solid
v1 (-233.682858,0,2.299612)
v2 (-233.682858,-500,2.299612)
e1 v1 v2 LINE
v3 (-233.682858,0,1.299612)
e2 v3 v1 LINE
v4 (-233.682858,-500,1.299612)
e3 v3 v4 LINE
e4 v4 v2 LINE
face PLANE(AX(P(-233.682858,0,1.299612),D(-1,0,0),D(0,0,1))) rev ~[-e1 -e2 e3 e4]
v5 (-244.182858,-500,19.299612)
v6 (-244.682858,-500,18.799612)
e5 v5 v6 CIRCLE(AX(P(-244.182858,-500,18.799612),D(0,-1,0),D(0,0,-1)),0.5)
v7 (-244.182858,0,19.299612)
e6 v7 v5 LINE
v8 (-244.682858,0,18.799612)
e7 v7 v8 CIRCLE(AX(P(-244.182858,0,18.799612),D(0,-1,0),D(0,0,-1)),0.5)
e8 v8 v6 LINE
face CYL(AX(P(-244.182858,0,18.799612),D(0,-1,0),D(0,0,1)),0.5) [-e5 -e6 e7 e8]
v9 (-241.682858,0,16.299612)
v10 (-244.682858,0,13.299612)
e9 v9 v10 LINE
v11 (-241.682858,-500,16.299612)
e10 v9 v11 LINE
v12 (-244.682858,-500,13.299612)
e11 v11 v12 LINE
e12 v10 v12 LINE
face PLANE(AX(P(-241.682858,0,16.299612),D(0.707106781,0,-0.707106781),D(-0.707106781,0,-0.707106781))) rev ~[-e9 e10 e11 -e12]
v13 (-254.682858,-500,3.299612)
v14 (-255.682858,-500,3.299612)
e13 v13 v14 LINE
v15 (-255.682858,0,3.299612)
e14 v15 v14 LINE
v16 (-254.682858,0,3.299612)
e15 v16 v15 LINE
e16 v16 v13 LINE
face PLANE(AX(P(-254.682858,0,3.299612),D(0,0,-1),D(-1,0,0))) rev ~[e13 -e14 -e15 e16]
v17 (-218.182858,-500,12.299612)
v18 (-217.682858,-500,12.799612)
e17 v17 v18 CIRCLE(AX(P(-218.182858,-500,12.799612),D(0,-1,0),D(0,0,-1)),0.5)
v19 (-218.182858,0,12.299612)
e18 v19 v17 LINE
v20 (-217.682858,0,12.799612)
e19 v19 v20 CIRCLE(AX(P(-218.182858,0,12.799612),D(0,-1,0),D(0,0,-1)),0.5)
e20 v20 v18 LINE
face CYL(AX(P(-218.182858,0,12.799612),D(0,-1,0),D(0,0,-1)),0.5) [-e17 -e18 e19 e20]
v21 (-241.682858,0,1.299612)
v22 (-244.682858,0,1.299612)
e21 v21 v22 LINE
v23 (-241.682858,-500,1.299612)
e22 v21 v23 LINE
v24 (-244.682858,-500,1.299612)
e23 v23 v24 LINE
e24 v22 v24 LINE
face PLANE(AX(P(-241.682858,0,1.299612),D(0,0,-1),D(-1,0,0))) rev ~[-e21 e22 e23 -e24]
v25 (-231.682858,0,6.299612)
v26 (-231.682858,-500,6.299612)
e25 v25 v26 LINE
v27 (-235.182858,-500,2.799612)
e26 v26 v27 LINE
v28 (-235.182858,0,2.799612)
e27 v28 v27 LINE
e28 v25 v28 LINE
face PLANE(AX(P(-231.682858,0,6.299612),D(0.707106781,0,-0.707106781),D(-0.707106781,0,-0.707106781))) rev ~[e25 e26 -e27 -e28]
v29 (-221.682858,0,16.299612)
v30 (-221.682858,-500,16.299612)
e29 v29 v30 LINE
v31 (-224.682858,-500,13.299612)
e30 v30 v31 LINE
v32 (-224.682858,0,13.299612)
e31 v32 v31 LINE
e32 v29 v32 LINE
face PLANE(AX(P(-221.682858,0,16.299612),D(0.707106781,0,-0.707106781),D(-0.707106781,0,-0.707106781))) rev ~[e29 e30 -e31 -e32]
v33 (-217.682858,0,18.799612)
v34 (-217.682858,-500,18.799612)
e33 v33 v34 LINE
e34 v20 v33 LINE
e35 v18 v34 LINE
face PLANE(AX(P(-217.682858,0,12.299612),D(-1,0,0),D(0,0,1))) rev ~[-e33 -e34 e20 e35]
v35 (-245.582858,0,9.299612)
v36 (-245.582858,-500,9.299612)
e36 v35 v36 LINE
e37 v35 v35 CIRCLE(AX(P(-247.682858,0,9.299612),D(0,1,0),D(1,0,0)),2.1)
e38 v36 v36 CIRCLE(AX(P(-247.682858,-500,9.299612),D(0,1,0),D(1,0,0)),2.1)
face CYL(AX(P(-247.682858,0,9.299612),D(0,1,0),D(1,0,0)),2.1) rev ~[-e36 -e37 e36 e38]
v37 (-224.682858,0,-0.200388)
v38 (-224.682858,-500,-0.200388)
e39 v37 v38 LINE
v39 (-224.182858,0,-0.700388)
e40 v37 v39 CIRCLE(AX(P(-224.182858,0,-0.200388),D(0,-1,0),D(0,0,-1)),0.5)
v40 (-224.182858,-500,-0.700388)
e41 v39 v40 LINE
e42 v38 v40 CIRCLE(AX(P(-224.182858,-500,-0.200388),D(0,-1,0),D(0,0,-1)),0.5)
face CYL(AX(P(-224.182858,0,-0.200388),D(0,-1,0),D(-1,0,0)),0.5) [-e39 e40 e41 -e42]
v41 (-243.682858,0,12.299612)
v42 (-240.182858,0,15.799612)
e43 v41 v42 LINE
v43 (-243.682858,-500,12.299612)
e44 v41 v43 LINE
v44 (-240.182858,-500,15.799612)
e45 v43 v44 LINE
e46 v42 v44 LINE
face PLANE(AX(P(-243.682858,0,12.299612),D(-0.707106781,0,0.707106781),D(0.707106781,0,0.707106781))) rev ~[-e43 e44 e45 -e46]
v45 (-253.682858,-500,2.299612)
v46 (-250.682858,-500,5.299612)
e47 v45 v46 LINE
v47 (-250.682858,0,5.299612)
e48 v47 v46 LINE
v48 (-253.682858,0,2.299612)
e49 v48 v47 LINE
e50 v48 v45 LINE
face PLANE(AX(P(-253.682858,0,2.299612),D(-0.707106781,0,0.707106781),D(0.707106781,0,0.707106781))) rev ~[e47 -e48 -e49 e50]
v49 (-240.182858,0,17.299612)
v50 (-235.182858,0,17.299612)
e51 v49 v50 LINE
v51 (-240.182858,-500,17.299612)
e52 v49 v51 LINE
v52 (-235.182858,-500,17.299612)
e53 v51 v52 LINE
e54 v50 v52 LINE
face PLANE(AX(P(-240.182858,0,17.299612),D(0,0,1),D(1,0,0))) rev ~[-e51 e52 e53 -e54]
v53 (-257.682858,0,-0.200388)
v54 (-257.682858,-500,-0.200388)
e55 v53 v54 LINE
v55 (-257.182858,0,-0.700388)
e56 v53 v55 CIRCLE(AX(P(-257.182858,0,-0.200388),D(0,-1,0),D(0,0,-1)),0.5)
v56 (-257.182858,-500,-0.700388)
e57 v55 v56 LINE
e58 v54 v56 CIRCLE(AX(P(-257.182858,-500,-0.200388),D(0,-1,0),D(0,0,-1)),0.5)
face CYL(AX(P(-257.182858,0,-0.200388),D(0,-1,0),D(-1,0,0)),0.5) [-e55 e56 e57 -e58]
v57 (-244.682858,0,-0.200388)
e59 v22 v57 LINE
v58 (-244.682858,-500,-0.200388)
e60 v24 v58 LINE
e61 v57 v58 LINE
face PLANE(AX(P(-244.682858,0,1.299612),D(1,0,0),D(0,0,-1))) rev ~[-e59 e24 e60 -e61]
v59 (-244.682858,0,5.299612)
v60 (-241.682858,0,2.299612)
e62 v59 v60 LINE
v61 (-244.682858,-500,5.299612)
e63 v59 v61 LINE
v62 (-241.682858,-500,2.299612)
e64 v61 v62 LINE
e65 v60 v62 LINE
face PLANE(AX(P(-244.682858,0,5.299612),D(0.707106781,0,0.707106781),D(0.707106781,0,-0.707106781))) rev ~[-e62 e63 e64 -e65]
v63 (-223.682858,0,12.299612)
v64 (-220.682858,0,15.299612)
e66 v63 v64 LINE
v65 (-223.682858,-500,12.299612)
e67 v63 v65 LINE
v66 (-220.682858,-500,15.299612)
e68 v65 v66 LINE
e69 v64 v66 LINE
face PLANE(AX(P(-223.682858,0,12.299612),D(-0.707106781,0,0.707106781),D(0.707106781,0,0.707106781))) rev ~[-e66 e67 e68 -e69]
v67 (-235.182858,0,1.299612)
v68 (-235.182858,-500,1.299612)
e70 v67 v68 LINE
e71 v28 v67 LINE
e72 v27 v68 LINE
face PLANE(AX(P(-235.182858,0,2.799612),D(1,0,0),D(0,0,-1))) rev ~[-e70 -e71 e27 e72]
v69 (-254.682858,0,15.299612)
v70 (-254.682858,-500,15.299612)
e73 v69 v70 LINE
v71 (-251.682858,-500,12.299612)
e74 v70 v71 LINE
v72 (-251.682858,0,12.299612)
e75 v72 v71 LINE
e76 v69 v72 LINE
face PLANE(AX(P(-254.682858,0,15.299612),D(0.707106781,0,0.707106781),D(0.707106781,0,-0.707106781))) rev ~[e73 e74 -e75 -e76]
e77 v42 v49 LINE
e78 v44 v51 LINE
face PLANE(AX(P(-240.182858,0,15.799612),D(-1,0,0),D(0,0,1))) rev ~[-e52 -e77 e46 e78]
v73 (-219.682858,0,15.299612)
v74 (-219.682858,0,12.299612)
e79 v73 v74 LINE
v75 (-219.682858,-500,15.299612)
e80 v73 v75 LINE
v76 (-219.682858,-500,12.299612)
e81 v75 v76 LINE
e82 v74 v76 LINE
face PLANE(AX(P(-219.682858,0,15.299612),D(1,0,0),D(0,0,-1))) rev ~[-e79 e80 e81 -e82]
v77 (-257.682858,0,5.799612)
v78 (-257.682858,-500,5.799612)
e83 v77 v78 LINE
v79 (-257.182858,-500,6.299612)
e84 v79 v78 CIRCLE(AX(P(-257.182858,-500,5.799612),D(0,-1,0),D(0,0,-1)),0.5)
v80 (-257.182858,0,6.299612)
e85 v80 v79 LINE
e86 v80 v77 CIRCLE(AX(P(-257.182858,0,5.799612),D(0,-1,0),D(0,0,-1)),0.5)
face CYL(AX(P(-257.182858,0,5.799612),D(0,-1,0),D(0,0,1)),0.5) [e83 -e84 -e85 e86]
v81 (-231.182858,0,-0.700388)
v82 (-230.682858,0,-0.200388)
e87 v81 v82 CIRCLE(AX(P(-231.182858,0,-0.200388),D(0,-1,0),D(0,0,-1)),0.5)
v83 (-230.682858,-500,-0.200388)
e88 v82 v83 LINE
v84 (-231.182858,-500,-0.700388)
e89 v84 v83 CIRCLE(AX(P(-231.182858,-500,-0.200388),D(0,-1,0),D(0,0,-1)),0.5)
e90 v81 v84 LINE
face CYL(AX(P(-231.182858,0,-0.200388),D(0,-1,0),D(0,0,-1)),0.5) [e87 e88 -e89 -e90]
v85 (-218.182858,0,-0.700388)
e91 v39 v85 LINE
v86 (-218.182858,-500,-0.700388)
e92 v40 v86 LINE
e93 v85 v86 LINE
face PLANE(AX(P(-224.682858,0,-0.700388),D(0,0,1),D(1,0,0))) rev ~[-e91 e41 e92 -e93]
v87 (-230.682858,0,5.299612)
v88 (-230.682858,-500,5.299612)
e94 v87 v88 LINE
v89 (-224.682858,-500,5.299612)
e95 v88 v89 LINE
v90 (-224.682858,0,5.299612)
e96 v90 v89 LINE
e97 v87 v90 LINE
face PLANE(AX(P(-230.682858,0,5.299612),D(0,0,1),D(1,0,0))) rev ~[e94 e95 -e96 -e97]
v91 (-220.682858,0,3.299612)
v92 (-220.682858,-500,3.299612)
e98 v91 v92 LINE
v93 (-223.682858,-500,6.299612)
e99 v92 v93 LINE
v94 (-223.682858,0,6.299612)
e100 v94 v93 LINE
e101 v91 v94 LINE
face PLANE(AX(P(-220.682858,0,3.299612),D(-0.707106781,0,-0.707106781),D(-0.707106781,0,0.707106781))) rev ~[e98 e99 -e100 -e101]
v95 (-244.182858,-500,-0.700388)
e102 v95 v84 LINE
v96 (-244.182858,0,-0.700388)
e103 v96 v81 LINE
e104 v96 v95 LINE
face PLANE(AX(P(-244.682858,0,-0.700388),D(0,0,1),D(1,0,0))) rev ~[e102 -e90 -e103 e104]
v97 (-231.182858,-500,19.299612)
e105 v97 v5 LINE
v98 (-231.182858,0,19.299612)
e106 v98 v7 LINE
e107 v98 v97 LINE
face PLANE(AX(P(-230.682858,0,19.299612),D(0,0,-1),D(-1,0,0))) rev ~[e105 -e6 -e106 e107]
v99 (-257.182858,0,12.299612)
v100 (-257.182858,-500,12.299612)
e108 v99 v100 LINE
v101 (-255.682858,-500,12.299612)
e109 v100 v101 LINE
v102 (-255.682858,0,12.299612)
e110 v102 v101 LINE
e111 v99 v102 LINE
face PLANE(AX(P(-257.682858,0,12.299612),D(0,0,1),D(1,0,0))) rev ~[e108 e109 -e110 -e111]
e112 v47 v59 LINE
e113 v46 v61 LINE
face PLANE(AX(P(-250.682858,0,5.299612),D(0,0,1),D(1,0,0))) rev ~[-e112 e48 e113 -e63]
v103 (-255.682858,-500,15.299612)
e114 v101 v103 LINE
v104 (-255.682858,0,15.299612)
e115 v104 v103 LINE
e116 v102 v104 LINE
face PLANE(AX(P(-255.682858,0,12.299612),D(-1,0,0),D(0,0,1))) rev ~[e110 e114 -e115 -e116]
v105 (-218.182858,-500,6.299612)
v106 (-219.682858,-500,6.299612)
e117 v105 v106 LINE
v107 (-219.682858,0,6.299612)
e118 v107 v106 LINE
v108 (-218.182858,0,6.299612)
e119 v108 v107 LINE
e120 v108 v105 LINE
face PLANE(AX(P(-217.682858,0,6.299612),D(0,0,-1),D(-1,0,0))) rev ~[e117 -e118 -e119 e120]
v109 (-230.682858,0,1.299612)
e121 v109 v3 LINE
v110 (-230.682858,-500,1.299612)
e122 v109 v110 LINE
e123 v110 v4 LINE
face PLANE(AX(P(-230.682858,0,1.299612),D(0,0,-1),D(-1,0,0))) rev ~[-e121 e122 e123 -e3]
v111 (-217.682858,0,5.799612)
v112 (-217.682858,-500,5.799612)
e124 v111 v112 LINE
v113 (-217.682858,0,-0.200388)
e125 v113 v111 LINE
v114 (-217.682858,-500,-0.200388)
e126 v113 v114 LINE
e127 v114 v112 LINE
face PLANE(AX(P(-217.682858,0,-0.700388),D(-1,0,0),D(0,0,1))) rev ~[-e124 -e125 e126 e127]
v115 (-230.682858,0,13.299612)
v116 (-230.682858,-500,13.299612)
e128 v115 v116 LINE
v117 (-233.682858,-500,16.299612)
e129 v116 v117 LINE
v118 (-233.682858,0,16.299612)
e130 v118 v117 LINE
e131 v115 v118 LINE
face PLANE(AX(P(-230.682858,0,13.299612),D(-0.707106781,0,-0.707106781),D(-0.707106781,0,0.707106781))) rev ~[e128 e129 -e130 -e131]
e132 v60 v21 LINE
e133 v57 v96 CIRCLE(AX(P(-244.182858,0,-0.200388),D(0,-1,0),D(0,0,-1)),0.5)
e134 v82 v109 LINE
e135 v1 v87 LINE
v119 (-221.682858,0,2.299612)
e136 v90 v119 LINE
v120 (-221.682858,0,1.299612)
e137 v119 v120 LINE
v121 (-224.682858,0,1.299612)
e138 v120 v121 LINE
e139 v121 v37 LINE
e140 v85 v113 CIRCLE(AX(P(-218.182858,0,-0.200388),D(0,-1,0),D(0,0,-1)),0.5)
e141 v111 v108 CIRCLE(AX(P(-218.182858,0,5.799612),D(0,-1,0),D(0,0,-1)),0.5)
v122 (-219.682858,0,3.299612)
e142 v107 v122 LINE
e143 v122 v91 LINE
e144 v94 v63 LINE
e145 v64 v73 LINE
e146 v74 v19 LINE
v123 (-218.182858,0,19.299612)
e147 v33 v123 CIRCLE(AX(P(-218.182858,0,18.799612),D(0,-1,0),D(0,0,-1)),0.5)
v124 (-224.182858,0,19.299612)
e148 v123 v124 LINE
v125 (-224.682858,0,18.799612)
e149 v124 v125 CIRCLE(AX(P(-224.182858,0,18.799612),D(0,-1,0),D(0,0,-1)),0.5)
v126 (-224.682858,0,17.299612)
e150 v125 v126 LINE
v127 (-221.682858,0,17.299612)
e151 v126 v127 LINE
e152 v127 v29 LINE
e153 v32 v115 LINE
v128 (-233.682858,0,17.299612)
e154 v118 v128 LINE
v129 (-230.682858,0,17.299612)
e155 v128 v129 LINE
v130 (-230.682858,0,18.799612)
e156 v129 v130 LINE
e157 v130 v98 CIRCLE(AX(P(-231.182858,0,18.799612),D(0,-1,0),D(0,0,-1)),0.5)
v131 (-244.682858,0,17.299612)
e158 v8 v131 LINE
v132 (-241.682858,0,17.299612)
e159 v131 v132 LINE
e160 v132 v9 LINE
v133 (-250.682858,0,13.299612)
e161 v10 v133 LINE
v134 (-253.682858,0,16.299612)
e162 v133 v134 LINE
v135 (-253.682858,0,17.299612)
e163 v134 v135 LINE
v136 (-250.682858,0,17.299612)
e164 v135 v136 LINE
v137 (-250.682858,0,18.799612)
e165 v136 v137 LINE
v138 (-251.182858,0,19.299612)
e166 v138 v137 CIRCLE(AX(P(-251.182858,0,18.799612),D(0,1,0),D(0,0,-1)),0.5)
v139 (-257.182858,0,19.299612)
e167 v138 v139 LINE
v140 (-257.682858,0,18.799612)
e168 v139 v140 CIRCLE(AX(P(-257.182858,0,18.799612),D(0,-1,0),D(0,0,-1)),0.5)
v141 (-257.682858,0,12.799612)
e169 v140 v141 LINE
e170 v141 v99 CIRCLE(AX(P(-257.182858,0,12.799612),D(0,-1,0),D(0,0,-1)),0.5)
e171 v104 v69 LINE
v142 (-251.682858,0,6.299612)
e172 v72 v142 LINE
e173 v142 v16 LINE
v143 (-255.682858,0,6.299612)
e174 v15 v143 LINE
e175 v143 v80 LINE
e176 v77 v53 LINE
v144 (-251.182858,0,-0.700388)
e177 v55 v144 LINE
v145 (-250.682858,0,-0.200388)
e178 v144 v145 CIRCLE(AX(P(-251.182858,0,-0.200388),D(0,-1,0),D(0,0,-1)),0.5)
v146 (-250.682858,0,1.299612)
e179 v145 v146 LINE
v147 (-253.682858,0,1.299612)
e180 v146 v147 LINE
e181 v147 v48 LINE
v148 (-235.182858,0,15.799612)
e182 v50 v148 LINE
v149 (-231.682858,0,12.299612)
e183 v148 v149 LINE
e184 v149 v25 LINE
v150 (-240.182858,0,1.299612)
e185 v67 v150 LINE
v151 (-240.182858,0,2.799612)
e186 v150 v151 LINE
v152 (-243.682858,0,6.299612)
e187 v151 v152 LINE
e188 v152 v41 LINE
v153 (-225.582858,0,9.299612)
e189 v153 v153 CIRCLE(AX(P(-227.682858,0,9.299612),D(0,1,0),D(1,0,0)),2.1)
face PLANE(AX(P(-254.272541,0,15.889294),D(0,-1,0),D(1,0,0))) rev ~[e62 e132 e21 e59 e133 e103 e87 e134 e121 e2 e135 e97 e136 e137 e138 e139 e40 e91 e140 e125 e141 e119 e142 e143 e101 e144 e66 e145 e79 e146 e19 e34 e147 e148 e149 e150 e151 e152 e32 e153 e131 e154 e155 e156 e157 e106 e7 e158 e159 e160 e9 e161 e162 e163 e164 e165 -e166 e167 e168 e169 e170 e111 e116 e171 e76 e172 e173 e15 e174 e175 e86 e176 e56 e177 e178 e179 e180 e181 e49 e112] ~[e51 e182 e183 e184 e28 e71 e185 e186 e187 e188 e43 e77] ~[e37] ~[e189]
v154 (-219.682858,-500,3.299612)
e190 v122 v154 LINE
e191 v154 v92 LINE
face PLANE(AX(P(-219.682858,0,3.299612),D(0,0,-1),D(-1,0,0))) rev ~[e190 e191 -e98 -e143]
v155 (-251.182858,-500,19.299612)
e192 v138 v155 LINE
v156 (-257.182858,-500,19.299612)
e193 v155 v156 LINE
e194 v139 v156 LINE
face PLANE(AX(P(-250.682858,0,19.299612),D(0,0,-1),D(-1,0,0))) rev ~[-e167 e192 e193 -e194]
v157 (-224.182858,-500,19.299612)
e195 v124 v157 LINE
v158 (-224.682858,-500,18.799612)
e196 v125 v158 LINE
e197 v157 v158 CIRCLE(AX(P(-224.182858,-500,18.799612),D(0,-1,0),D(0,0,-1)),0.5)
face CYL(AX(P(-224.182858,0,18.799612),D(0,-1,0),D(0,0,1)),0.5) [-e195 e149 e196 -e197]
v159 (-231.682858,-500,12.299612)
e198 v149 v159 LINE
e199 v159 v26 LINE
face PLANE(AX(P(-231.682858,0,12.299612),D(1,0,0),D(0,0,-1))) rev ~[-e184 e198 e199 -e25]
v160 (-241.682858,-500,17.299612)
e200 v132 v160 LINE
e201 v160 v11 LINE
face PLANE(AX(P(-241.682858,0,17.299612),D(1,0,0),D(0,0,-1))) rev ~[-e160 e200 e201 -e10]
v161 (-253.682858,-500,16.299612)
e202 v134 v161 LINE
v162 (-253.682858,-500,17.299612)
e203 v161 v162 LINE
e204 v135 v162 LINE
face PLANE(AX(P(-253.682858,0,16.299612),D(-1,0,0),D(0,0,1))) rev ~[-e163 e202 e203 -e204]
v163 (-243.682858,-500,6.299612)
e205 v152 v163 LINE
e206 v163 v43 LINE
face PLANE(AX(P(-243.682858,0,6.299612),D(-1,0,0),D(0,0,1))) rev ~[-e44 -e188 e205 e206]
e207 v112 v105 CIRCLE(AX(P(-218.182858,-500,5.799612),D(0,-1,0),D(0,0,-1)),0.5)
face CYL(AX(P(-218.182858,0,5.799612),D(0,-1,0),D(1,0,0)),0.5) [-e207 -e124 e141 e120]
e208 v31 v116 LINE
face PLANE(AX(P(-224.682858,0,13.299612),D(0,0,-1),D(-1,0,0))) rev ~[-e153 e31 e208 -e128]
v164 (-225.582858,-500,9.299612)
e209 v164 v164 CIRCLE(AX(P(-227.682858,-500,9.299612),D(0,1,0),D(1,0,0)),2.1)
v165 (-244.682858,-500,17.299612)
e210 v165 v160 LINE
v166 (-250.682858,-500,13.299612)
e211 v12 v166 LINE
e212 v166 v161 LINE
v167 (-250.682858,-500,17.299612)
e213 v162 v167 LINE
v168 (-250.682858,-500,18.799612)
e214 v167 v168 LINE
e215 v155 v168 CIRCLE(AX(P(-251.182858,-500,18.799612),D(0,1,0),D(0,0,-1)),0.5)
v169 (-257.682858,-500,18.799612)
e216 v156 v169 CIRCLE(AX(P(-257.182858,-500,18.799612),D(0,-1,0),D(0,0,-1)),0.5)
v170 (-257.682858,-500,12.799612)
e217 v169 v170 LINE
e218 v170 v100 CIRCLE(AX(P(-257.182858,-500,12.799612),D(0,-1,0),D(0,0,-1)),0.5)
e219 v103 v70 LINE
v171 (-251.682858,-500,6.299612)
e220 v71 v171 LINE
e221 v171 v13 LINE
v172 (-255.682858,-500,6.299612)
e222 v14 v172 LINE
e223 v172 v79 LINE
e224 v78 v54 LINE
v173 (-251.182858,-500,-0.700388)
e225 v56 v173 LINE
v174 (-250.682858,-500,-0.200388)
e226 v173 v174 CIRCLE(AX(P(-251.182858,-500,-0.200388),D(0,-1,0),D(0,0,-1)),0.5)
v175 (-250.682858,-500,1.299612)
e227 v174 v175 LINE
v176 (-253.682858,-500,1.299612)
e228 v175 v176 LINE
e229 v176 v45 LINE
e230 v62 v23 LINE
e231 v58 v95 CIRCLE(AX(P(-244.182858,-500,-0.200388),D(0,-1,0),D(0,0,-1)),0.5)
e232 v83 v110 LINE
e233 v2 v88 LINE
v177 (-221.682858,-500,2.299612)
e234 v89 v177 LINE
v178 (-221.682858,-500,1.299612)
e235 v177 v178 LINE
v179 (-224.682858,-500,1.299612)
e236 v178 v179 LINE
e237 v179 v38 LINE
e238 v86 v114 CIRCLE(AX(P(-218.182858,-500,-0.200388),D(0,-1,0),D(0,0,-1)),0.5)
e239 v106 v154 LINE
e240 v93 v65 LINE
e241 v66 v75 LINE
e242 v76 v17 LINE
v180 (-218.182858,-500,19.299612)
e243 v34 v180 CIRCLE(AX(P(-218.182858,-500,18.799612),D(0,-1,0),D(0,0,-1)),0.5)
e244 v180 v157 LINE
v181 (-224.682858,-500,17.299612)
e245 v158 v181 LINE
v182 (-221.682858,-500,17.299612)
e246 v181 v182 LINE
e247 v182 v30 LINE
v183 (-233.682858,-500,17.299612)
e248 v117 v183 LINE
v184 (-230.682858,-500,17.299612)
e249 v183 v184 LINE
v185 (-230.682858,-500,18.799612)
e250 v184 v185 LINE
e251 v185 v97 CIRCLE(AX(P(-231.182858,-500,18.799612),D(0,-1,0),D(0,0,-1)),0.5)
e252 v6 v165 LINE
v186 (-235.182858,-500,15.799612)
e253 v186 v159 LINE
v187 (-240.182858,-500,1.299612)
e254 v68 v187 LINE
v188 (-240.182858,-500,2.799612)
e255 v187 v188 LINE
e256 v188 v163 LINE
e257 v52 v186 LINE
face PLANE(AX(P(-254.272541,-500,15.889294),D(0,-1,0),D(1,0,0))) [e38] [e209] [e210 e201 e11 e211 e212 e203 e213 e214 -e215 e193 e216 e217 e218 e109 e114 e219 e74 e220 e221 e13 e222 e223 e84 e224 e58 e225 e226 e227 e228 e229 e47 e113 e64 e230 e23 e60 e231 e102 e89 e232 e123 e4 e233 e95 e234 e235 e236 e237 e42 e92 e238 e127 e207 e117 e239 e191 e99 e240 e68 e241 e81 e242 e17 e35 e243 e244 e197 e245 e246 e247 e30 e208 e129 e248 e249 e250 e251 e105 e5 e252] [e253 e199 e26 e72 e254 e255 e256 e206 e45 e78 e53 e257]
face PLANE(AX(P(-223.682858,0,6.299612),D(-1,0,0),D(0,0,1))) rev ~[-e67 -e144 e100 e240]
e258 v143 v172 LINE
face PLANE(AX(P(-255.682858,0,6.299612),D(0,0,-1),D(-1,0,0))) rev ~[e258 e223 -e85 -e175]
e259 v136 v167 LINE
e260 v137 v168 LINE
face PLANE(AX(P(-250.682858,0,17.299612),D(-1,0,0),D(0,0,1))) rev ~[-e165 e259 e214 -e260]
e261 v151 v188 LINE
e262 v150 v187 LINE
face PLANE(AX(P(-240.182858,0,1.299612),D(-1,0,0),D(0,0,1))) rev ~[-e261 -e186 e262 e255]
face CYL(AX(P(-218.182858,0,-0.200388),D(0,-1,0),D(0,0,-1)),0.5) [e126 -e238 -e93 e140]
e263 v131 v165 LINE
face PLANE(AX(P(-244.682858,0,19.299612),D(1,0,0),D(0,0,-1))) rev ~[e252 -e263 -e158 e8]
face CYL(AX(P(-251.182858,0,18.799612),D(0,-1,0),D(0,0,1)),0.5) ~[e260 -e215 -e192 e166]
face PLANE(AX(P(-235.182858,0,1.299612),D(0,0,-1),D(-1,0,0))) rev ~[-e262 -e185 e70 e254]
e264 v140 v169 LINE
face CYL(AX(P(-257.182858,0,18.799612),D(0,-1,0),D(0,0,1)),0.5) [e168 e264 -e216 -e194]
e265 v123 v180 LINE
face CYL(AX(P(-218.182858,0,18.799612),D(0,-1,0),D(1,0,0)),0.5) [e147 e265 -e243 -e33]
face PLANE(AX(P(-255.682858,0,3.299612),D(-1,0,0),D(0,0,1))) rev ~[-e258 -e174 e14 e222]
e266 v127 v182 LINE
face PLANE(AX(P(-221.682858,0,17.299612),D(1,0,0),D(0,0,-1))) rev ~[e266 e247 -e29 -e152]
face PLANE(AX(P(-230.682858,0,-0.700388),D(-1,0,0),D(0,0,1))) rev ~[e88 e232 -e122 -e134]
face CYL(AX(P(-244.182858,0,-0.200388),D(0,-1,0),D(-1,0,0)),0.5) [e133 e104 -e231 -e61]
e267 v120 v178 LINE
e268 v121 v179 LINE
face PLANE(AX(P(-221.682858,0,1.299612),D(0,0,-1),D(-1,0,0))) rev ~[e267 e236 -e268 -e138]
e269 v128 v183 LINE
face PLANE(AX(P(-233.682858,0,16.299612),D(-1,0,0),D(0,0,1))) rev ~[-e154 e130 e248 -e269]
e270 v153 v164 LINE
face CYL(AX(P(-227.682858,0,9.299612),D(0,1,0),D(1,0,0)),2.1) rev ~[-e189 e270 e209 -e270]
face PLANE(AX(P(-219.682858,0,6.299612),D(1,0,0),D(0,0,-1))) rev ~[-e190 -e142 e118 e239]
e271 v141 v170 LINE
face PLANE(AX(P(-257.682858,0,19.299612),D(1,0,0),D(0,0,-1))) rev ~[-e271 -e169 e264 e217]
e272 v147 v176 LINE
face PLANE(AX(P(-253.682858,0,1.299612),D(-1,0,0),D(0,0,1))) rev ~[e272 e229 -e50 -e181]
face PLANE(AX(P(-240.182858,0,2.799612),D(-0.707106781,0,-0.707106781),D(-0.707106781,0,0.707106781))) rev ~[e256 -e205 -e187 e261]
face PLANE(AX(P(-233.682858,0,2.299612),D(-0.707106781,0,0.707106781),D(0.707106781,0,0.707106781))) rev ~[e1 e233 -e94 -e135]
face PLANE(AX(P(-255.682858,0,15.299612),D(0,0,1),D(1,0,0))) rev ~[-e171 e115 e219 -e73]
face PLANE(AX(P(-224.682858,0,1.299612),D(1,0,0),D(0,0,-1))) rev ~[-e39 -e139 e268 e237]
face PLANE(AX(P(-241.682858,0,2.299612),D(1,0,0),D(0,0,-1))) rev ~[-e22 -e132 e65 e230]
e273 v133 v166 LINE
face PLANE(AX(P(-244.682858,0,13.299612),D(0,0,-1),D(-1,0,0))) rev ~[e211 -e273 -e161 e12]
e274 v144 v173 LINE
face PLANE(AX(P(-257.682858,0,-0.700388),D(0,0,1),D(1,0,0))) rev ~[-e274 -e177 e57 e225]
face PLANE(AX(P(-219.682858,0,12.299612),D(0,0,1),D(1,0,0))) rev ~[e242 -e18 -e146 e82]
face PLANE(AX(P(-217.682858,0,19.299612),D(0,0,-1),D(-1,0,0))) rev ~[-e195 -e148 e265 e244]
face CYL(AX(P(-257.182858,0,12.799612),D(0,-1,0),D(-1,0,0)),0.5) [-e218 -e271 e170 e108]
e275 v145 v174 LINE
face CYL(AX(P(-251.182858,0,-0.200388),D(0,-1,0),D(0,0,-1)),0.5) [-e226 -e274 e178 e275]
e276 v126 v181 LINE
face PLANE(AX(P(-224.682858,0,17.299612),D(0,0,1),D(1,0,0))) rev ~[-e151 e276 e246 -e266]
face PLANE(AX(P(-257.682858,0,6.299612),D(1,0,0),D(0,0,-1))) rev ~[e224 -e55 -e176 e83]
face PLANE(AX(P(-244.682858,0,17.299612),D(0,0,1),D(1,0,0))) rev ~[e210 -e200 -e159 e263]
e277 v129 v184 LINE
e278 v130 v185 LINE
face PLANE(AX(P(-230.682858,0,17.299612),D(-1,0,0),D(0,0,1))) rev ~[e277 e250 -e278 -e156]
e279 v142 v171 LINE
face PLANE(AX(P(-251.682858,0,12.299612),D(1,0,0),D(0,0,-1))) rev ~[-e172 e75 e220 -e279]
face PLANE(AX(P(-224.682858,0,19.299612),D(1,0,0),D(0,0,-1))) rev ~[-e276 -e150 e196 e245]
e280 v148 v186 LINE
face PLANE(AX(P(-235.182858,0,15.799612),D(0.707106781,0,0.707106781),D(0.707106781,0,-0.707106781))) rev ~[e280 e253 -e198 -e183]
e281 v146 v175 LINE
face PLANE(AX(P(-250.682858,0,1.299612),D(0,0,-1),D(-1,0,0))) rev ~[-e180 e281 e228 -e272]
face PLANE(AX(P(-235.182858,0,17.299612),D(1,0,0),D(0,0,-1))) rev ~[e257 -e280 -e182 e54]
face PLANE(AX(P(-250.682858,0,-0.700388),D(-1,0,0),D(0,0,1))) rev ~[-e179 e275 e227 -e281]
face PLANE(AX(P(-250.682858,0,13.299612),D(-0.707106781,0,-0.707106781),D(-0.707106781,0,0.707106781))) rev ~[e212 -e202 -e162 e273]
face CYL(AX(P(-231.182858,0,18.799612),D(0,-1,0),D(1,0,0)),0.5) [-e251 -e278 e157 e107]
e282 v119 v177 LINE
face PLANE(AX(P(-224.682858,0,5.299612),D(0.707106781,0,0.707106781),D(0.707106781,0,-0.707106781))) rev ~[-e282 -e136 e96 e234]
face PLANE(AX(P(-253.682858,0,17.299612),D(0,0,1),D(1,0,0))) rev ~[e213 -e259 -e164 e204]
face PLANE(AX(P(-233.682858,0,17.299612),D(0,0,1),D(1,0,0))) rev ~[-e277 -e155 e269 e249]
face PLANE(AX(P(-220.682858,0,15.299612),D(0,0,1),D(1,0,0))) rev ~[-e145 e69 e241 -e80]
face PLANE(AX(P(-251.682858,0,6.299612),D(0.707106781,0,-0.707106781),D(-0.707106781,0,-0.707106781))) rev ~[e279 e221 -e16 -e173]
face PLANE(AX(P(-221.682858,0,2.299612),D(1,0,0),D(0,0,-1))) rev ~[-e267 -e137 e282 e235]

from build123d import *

# Parameters (mm, degrees)
F1_DEPTH = 500
F2_R     = 0.5


with BuildPart() as f1:
    # F0 (on Front) → F1 (new body)
    with BuildSketch(Plane.XZ):
        Polygon((-250.682858482, 19.2996120907), (-257.682858482, 19.2996120907), (-257.682858482, 12.2996120907), (-255.682858482, 12.2996120907), (-255.682858482, 15.2996120907), (-254.682858482, 15.2996120907), (-251.682858482, 12.2996120907), (-251.682858482, 13.2996120907), (-250.682858482, 13.2996120907), (-253.682858482, 16.2996120907), (-253.682858482, 17.2996120907), (-250.682858482, 17.2996120907), align=None)
        Polygon((-237.682858482, 19.2996120907), (-244.682858482, 19.2996120907), (-244.682858482, 17.2996120907), (-241.682858482, 17.2996120907), (-241.682858482, 16.2996120907), (-244.682858482, 13.2996120907), (-243.682858482, 13.2996120907), (-243.682858482, 12.2996120907), (-240.182858482, 15.7996120907), (-240.182858482, 17.2996120907), (-237.682858482, 17.2996120907), align=None)
        Polygon((-230.682858482, 19.2996120907), (-237.682858482, 19.2996120907), (-237.682858482, 17.2996120907), (-235.182858482, 17.2996120907), (-235.182858482, 15.7996120907), (-231.682858482, 12.2996120907), (-231.682858482, 13.2996120907), (-230.682858482, 13.2996120907), (-233.682858482, 16.2996120907), (-233.682858482, 17.2996120907), (-230.682858482, 17.2996120907), align=None)
        Polygon((-255.682858482, 6.2996120907), (-257.682858482, 6.2996120907), (-257.682858482, -0.7003879093), (-250.682858482, -0.7003879093), (-250.682858482, 1.2996120907), (-253.682858482, 1.2996120907), (-253.682858482, 2.2996120907), (-250.682858482, 5.2996120907), (-251.682858482, 5.2996120907), (-251.682858482, 6.2996120907), (-254.682858482, 3.2996120907), (-255.682858482, 3.2996120907), align=None)
        with BuildLine():
            ThreePointArc((-247.6828584684, 5.2996120907), (-250.5112856019, 6.4711849611), (-251.682858482, 9.2996120907))
            Line((-251.682858482, 9.2996120907), (-251.682858482, 6.2996120907))
            Line((-251.682858482, 6.2996120907), (-251.682858482, 5.2996120907))
            Line((-251.682858482, 5.2996120907), (-250.682858482, 5.2996120907))
            Line((-250.682858482, 5.2996120907), (-247.6828584684, 5.2996120907))
        make_face()
        with BuildLine():
            Line((-251.682858482, 12.2996120907), (-251.682858482, 9.2996120907))
            ThreePointArc((-251.682858482, 9.2996120907), (-250.5112856067, 12.1280392154), (-247.682858482, 13.2996120907))
            Line((-247.682858482, 13.2996120907), (-250.682858482, 13.2996120907))
            Line((-250.682858482, 13.2996120907), (-251.682858482, 13.2996120907))
            Line((-251.682858482, 13.2996120907), (-251.682858482, 12.2996120907))
        make_face()
        with BuildLine():
            Line((-249.782858482, 9.2996120907), (-251.682858482, 9.2996120907))
            ThreePointArc((-251.682858482, 9.2996120907), (-250.5112856019, 6.4711849611), (-247.6828584684, 5.2996120907))
            ThreePointArc((-247.6828584684, 5.2996120907), (-244.8544313524, 6.4711849708), (-243.682858482, 9.2996120907))
            Line((-243.682858482, 9.2996120907), (-245.582858482, 9.2996120907))
            ThreePointArc((-245.582858482, 9.2996120907), (-247.682858482, 7.1996120907), (-249.782858482, 9.2996120907))
        make_face()
        with BuildLine():
            ThreePointArc((-247.682858482, 13.2996120907), (-250.5112856067, 12.1280392154), (-251.682858482, 9.2996120907))
            Line((-251.682858482, 9.2996120907), (-249.782858482, 9.2996120907))
            ThreePointArc((-249.782858482, 9.2996120907), (-247.682858482, 11.3996120907), (-245.582858482, 9.2996120907))
            Line((-245.582858482, 9.2996120907), (-243.682858482, 9.2996120907))
            ThreePointArc((-243.682858482, 9.2996120907), (-244.8544313573, 12.1280392154), (-247.682858482, 13.2996120907))
        make_face()
        Polygon((-217.682858482, 19.2996120907), (-224.682858482, 19.2996120907), (-224.682858482, 17.2996120907), (-221.682858482, 17.2996120907), (-221.682858482, 16.2996120907), (-224.682858482, 13.2996120907), (-223.682858482, 13.2996120907), (-223.682858482, 12.2996120907), (-220.682858482, 15.2996120907), (-219.682858482, 15.2996120907), (-219.682858482, 12.2996120907), (-217.682858482, 12.2996120907), align=None)
        with BuildLine():
            Line((-244.682858482, 13.2996120907), (-247.682858482, 13.2996120907))
            ThreePointArc((-247.682858482, 13.2996120907), (-244.8544313573, 12.1280392154), (-243.682858482, 9.2996120907))
            Line((-243.682858482, 9.2996120907), (-243.682858482, 12.2996120907))
            Line((-243.682858482, 12.2996120907), (-243.682858482, 13.2996120907))
            Line((-243.682858482, 13.2996120907), (-244.682858482, 13.2996120907))
        make_face()
        with BuildLine():
            ThreePointArc((-243.682858482, 9.2996120907), (-244.8544313524, 6.4711849708), (-247.6828584684, 5.2996120907))
            Line((-247.6828584684, 5.2996120907), (-244.682858482, 5.2996120907))
            Line((-244.682858482, 5.2996120907), (-243.682858482, 5.2996120907))
            Line((-243.682858482, 5.2996120907), (-243.682858482, 6.2996120907))
            Line((-243.682858482, 6.2996120907), (-243.682858482, 9.2996120907))
        make_face()
        with BuildLine():
            ThreePointArc((-227.682858482, 5.2996120907), (-230.5112856067, 6.4711849659), (-231.682858482, 9.2996120907))
            Line((-231.682858482, 9.2996120907), (-231.682858482, 6.2996120907))
            Line((-231.682858482, 6.2996120907), (-231.682858482, 5.2996120907))
            Line((-231.682858482, 5.2996120907), (-230.682858482, 5.2996120907))
            Line((-230.682858482, 5.2996120907), (-227.682858482, 5.2996120907))
        make_face()
        with BuildLine():
            Line((-231.682858482, 12.2996120907), (-231.682858482, 9.2996120907))
            ThreePointArc((-231.682858482, 9.2996120907), (-230.5112856067, 12.1280392154), (-227.682858482, 13.2996120907))
            Line((-227.682858482, 13.2996120907), (-230.682858482, 13.2996120907))
            Line((-230.682858482, 13.2996120907), (-231.682858482, 13.2996120907))
            Line((-231.682858482, 13.2996120907), (-231.682858482, 12.2996120907))
        make_face()
        with BuildLine():
            Line((-229.782858482, 9.2996120907), (-231.682858482, 9.2996120907))
            ThreePointArc((-231.682858482, 9.2996120907), (-230.5112856067, 6.4711849659), (-227.682858482, 5.2996120907))
            ThreePointArc((-227.682858482, 5.2996120907), (-224.8544313573, 6.4711849659), (-223.682858482, 9.2996120907))
            Line((-223.682858482, 9.2996120907), (-225.582858482, 9.2996120907))
            ThreePointArc((-225.582858482, 9.2996120907), (-227.682858482, 7.1996120907), (-229.782858482, 9.2996120907))
        make_face()
        with BuildLine():
            ThreePointArc((-227.682858482, 13.2996120907), (-230.5112856067, 12.1280392154), (-231.682858482, 9.2996120907))
            Line((-231.682858482, 9.2996120907), (-229.782858482, 9.2996120907))
            ThreePointArc((-229.782858482, 9.2996120907), (-227.682858482, 11.3996120907), (-225.582858482, 9.2996120907))
            Line((-225.582858482, 9.2996120907), (-223.682858482, 9.2996120907))
            ThreePointArc((-223.682858482, 9.2996120907), (-224.8544313573, 12.1280392154), (-227.682858482, 13.2996120907))
        make_face()
        Polygon((-235.182858482, 1.2996120907), (-237.682858482, 1.2996120907), (-237.682858482, -0.7003879093), (-230.682858482, -0.7003879093), (-230.682858482, 1.2996120907), (-233.682858482, 1.2996120907), (-233.682858482, 2.2996120907), (-230.682858482, 5.2996120907), (-231.682858482, 5.2996120907), (-231.682858482, 6.2996120907), (-235.182858482, 2.7996120907), align=None)
        Polygon((-237.682858482, -0.7003879093), (-237.682858482, 1.2996120907), (-240.182858482, 1.2996120907), (-240.182858482, 2.7996120907), (-243.682858482, 6.2996120907), (-243.682858482, 5.2996120907), (-244.682858482, 5.2996120907), (-241.682858482, 2.2996120907), (-241.682858482, 1.2996120907), (-244.682858482, 1.2996120907), (-244.682858482, -0.7003879093), align=None)
        with BuildLine():
            Line((-224.682858482, 13.2996120907), (-227.682858482, 13.2996120907))
            ThreePointArc((-227.682858482, 13.2996120907), (-224.8544313573, 12.1280392154), (-223.682858482, 9.2996120907))
            Line((-223.682858482, 9.2996120907), (-223.682858482, 12.2996120907))
            Line((-223.682858482, 12.2996120907), (-223.682858482, 13.2996120907))
            Line((-223.682858482, 13.2996120907), (-224.682858482, 13.2996120907))
        make_face()
        with BuildLine():
            ThreePointArc((-223.682858482, 9.2996120907), (-224.8544313573, 6.4711849659), (-227.682858482, 5.2996120907))
            Line((-227.682858482, 5.2996120907), (-224.682858482, 5.2996120907))
            Line((-224.682858482, 5.2996120907), (-223.682858482, 5.2996120907))
            Line((-223.682858482, 5.2996120907), (-223.682858482, 6.2996120907))
            Line((-223.682858482, 6.2996120907), (-223.682858482, 9.2996120907))
        make_face()
        Polygon((-223.682858482, 5.2996120907), (-224.682858482, 5.2996120907), (-221.682858482, 2.2996120907), (-221.682858482, 1.2996120907), (-224.682858482, 1.2996120907), (-224.682858482, -0.7003879093), (-217.682858482, -0.7003879093), (-217.682858482, 6.2996120907), (-219.682858482, 6.2996120907), (-219.682858482, 3.2996120907), (-220.682858482, 3.2996120907), (-223.682858482, 6.2996120907), align=None)
    extrude(amount=F1_DEPTH)

    # F2
    f2_edges = [f1.edges().sort_by_distance(p)[0] for p in [
        (-257.682858, -250, 19.299612),
        (-250.682858, -250, 19.299612),
        (-244.682858, -250, 19.299612),
        (-230.682858, -250, 19.299612),
        (-224.682858, -250, 19.299612),
        (-217.682858, -250, 19.299612),
        (-217.682858, -250, 12.299612),
        (-217.682858, -250, 6.299612),
        (-217.682858, -250, -0.700388),
        (-230.682858, -250, -0.700388),
        (-250.682858, -250, -0.700388),
        (-257.682858, -250, 6.299612),
        (-257.682858, -250, 12.299612),
        (-257.682858, -250, -0.700388),
        (-244.682858, -250, -0.700388),
        (-224.682858, -250, -0.700388),
    ]]
    fillet(f2_edges, radius=F2_R)


solid = f1.part
